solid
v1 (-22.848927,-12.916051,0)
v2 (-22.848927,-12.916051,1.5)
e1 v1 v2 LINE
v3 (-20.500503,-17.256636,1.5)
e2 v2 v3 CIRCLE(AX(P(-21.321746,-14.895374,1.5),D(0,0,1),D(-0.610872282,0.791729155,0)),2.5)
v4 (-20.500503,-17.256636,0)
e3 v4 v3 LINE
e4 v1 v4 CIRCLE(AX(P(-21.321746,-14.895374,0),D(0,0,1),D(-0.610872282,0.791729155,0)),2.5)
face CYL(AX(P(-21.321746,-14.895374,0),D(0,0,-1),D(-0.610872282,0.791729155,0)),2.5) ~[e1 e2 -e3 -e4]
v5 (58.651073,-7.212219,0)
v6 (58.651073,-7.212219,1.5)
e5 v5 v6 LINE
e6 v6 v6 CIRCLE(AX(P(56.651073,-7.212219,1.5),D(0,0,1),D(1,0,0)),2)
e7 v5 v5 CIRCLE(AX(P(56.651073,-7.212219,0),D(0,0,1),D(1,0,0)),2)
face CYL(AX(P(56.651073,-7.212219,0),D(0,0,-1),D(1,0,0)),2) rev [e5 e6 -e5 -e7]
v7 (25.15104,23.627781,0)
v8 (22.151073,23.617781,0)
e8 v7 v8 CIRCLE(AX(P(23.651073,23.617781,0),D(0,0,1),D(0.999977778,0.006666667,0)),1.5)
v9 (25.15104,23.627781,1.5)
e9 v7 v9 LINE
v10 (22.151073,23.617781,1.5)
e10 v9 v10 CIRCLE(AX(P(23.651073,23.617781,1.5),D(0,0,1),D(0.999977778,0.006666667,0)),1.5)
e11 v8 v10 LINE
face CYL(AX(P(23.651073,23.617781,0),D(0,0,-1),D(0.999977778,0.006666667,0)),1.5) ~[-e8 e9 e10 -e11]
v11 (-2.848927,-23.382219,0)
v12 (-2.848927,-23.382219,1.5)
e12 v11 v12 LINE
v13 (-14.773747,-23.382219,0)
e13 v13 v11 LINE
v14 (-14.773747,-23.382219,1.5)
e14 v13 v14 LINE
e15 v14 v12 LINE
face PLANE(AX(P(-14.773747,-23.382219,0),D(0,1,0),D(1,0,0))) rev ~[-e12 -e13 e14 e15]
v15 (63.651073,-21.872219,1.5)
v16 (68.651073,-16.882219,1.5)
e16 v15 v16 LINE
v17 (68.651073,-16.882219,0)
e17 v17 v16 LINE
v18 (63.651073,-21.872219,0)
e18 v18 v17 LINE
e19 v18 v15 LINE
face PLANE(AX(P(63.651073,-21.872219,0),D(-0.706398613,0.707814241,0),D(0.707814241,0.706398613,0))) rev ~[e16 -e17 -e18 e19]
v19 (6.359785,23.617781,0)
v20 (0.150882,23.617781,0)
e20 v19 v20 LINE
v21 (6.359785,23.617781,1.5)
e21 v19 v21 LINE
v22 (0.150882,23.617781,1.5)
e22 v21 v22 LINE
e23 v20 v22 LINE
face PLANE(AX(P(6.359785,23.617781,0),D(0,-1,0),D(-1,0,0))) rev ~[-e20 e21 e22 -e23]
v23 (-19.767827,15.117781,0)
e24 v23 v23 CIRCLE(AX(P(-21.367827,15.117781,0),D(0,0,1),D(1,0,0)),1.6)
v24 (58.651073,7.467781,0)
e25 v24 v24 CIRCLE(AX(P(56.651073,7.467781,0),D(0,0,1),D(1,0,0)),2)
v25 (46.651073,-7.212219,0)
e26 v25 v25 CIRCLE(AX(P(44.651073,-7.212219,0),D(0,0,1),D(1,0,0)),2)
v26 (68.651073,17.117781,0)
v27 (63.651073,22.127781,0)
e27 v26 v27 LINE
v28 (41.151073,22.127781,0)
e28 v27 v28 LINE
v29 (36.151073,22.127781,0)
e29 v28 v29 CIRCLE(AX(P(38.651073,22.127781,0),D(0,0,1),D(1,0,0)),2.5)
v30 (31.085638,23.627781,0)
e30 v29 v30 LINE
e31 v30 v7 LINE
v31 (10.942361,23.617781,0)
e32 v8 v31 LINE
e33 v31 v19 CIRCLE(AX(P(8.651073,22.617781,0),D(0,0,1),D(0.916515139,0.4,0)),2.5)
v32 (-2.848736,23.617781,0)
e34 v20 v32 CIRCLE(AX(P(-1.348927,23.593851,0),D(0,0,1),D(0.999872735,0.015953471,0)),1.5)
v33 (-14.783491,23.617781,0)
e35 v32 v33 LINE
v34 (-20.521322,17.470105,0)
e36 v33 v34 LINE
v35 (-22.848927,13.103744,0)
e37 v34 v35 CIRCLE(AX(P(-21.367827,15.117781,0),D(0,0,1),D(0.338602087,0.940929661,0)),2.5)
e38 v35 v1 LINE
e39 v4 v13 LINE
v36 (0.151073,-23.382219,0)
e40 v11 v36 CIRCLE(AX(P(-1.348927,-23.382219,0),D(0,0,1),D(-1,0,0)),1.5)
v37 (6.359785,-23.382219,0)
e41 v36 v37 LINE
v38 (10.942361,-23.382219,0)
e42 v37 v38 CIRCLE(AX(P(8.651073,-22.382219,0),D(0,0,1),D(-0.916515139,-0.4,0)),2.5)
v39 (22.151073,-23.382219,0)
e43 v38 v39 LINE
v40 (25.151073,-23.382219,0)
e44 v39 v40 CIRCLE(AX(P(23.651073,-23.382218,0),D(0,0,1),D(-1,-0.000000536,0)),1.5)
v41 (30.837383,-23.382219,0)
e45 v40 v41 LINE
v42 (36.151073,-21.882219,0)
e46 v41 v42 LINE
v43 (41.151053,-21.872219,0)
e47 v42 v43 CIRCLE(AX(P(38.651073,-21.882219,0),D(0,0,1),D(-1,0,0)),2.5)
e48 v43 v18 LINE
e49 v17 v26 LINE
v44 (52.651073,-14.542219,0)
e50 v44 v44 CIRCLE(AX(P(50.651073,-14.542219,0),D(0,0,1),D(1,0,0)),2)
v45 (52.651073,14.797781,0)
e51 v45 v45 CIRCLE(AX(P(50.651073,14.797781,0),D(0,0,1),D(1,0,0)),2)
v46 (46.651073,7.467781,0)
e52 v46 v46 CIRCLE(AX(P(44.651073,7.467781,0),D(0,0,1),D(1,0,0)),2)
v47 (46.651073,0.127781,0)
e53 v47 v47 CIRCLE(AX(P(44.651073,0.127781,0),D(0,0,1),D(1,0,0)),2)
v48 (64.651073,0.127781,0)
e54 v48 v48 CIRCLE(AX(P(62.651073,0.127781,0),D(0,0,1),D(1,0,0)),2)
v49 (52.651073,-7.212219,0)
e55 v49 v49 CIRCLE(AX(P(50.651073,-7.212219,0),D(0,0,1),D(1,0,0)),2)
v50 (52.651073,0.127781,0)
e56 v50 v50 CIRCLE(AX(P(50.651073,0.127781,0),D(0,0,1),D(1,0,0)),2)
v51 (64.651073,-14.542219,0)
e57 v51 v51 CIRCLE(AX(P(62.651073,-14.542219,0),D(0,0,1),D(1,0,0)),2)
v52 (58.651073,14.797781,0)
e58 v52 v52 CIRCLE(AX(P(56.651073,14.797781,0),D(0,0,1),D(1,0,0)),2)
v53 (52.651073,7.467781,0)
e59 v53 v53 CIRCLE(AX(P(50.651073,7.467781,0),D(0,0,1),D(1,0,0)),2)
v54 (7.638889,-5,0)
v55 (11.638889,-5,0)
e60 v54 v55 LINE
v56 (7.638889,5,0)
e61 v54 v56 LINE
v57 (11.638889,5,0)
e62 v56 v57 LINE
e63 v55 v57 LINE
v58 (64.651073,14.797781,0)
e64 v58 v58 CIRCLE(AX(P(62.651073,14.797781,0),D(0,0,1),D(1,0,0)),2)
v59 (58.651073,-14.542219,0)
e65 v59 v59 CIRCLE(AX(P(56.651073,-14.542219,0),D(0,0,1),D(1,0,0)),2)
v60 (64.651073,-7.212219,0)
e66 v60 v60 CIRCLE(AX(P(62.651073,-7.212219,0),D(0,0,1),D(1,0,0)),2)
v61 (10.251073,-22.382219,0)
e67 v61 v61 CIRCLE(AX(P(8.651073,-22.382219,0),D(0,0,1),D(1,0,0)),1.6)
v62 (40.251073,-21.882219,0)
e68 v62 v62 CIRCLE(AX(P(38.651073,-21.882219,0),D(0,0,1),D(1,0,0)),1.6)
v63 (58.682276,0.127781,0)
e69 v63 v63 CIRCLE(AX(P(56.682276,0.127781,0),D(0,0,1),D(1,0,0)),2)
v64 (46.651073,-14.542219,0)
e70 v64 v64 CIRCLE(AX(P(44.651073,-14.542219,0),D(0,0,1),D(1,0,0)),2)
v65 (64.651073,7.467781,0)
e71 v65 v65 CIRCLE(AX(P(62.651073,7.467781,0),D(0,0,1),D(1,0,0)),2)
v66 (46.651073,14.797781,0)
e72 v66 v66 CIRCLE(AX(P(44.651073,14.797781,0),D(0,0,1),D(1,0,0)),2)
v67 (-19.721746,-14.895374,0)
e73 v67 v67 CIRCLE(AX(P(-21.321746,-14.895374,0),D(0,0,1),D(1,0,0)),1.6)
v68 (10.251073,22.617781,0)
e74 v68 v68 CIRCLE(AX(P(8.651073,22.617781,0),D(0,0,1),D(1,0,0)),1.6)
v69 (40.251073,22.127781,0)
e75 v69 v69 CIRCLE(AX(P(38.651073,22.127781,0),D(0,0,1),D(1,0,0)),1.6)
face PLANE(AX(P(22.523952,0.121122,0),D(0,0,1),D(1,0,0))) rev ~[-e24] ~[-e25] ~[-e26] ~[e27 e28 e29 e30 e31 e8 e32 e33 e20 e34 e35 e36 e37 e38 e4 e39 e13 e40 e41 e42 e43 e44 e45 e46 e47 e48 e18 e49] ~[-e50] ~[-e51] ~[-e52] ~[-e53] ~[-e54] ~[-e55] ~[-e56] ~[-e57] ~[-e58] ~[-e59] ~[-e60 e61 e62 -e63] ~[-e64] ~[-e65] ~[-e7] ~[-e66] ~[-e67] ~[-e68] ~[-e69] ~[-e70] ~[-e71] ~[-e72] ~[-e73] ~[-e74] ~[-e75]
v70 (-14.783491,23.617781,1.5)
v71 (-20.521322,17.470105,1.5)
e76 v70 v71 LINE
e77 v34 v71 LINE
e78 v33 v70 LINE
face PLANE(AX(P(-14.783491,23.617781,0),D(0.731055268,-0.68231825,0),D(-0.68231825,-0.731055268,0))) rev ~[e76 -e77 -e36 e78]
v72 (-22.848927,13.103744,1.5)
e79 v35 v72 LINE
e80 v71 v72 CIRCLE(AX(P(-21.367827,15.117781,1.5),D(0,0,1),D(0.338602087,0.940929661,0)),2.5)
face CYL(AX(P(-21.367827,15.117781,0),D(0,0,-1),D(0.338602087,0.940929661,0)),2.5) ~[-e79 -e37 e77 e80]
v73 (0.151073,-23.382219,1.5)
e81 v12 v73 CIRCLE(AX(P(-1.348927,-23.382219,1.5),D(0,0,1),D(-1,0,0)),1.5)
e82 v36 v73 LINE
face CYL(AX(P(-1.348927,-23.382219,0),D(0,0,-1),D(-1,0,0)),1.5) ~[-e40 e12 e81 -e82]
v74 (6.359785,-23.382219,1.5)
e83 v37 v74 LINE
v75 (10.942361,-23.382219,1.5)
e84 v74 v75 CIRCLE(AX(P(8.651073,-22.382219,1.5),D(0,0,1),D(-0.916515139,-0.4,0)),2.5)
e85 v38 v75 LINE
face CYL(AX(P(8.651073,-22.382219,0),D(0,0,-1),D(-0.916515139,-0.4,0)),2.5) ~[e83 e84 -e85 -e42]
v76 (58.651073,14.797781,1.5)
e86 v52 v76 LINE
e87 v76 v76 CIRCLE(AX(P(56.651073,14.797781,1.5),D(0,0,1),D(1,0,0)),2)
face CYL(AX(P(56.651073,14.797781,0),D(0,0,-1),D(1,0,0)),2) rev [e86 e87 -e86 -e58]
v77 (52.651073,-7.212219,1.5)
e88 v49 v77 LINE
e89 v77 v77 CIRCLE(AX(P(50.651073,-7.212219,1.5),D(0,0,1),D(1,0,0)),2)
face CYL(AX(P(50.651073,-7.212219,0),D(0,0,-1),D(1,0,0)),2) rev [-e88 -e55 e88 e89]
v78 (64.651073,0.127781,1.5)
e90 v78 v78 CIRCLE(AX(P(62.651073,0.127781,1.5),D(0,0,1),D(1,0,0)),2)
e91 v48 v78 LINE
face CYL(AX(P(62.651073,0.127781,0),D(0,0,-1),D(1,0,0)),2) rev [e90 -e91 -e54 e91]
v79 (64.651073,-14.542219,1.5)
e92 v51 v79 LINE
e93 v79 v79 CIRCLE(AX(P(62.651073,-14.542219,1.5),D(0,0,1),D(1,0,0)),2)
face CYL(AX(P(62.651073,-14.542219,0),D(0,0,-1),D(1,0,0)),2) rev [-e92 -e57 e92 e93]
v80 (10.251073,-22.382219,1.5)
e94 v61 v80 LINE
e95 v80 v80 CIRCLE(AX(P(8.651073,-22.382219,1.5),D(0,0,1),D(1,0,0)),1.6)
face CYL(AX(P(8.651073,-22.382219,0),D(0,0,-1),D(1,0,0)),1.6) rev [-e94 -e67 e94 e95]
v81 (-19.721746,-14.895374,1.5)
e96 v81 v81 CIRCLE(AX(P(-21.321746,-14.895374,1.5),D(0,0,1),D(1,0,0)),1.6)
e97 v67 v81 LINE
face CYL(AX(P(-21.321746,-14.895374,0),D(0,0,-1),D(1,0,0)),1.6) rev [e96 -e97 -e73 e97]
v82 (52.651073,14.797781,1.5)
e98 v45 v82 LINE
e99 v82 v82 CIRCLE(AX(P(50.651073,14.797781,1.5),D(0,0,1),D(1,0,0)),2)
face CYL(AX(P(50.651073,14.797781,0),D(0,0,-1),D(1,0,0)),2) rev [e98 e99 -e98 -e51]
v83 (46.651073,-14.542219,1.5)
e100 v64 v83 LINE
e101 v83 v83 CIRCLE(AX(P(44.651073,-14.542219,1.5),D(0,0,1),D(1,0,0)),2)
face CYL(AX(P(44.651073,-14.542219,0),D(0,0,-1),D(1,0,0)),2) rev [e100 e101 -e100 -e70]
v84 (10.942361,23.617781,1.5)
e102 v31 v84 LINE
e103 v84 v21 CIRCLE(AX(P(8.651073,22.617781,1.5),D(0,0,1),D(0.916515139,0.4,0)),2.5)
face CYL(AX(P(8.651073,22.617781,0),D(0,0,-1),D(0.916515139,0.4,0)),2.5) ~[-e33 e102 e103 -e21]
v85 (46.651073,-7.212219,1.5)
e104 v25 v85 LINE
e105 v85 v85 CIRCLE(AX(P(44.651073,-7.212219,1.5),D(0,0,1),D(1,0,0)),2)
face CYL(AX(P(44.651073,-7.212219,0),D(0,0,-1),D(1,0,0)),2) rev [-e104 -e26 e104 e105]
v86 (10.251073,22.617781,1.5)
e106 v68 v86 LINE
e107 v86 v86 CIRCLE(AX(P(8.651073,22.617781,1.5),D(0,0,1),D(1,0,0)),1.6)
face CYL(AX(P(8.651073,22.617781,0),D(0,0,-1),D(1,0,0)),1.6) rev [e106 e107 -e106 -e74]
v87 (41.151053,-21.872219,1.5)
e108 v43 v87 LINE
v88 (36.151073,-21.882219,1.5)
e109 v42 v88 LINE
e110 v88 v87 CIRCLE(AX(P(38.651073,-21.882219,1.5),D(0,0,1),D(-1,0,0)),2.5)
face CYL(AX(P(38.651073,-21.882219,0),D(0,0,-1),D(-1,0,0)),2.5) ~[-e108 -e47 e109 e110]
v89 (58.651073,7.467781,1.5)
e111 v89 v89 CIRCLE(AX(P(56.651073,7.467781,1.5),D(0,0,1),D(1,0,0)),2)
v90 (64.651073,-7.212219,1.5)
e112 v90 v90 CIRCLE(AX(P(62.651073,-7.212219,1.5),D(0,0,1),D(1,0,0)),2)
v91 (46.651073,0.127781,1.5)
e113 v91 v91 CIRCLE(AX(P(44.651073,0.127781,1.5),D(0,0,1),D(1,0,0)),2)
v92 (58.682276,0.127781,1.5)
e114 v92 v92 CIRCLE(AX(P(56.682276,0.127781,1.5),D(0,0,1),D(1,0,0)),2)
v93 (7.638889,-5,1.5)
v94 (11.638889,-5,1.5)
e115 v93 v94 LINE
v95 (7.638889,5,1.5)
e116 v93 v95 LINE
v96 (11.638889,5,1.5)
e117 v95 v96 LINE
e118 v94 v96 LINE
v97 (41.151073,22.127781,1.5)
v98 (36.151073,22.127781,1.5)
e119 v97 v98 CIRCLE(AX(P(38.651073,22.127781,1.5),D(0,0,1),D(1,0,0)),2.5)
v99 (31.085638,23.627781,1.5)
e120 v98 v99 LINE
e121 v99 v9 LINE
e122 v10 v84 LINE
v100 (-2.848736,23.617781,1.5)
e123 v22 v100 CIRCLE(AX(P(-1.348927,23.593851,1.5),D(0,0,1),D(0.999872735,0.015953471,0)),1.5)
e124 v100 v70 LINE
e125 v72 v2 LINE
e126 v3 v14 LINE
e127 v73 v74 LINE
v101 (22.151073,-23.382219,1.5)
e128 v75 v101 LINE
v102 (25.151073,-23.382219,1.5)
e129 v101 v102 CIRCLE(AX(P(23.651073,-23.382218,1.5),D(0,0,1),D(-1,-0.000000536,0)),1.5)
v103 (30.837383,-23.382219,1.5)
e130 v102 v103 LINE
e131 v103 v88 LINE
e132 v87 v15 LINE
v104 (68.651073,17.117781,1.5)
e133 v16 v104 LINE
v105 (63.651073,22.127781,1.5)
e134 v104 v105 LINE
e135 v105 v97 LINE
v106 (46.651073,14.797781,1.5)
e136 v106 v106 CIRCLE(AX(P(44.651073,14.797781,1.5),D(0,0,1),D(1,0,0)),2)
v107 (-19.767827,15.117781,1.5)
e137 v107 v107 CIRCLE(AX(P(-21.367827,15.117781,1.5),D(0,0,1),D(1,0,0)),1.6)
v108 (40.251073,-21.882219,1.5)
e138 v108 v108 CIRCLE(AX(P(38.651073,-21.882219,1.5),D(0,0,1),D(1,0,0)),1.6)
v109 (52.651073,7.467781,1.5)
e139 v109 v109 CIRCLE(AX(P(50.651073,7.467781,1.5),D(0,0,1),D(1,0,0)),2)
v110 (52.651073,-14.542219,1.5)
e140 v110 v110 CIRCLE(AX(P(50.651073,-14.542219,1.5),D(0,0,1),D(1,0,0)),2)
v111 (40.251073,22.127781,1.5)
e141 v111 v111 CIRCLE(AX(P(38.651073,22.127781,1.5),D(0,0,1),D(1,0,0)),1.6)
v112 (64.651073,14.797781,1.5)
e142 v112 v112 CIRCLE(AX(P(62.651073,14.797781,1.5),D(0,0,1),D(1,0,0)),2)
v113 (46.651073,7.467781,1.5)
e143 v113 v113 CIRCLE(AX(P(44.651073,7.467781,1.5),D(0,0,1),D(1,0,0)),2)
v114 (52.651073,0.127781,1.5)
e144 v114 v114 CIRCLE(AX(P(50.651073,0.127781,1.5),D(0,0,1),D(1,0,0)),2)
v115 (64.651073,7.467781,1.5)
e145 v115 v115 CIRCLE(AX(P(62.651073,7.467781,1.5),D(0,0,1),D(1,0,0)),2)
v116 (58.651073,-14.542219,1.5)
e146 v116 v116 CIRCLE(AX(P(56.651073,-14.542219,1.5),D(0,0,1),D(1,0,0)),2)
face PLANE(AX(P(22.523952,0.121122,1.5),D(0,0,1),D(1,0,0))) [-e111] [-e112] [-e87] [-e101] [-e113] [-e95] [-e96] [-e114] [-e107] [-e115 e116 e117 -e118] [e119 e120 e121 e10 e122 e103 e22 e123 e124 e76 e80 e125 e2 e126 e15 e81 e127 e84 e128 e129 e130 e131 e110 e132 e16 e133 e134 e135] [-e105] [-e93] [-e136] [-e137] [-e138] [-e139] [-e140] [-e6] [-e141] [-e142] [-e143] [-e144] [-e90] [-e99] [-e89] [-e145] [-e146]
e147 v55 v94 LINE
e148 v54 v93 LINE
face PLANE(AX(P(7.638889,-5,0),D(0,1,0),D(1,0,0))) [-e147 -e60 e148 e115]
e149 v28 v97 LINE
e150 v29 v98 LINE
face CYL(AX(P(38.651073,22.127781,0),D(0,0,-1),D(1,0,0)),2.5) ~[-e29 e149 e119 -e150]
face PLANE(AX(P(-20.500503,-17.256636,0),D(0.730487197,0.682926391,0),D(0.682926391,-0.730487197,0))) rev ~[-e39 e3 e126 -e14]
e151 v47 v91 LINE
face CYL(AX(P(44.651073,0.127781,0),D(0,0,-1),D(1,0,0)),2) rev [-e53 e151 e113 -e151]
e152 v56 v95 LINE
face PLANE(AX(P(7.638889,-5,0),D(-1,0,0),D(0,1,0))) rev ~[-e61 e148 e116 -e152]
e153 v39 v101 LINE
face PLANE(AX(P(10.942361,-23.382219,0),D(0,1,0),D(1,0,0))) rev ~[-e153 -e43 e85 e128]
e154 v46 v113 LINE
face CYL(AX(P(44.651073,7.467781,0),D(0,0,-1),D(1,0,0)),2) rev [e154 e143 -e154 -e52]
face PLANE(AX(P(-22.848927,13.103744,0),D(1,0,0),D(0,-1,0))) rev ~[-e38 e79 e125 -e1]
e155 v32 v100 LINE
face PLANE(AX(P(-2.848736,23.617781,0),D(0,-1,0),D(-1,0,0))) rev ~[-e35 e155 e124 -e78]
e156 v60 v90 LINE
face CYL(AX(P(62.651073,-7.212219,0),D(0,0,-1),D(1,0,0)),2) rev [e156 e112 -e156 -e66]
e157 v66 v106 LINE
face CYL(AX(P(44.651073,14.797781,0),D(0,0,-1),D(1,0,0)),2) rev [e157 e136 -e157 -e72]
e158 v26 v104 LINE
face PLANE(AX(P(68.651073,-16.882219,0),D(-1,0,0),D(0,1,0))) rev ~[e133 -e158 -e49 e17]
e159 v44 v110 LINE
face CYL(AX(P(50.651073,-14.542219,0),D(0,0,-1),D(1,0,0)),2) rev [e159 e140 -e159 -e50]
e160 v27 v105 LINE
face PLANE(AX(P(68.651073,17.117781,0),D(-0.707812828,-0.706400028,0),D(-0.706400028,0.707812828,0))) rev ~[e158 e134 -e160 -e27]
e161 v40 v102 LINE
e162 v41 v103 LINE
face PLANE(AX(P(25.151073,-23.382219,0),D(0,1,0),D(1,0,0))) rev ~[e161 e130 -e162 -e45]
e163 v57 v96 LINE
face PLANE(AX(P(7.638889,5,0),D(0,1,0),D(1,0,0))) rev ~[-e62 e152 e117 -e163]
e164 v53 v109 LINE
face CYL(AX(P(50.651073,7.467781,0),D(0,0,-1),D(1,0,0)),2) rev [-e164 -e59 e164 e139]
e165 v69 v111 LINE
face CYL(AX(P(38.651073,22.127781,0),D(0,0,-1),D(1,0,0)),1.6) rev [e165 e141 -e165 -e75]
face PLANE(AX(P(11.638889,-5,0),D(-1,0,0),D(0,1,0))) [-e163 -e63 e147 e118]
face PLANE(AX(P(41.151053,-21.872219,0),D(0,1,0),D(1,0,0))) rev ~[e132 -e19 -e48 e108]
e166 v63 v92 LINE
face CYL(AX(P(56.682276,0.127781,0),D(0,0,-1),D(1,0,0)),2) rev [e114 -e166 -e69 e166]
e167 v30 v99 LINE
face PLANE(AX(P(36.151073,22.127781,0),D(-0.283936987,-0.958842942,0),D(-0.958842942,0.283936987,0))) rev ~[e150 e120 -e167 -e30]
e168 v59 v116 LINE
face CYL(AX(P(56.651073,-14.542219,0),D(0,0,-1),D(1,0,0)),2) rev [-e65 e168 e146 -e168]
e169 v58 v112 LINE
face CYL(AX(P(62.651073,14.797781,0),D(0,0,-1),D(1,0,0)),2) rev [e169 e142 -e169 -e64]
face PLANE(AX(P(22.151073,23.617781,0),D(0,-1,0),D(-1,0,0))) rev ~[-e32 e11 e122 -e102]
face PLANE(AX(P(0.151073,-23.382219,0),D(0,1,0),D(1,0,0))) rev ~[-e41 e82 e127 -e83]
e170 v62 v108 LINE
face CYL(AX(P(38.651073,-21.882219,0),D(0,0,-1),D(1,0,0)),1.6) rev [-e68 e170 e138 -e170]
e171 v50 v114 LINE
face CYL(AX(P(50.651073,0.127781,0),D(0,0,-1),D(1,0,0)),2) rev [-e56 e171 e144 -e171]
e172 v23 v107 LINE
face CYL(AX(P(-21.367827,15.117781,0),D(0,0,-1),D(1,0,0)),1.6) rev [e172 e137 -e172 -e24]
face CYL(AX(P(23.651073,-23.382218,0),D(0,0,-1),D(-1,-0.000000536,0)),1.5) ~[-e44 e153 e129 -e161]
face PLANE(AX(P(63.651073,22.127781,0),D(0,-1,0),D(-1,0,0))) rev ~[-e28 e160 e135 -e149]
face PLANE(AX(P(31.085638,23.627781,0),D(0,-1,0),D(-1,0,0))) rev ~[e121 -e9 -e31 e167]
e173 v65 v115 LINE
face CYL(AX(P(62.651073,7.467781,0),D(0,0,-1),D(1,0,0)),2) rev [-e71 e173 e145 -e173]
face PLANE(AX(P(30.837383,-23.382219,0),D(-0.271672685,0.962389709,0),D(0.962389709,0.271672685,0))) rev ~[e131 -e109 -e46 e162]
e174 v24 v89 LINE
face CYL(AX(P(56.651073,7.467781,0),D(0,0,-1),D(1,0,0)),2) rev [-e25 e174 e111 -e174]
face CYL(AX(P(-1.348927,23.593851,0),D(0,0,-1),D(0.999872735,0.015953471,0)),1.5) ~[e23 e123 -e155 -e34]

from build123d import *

# Parameters (mm, degrees)
F0_R     = 1.6
F0_W     = 4
F0_H     = 10
F0_R_2   = 2
F1_DEPTH = 1.5


# Not quite as in the source:
# - ends of sketch curves that miss each other by under 0.0002 mm in the source are joined


with BuildPart() as f1:
    # F0 (on Top) → F1 (new body)
    with BuildSketch(Plane.XY):
        with BuildLine():
            Line((25.1510733024, -23.3822189373), (30.8373828109, -23.3822189373))
            Line((30.8373828109, -23.3822189373), (36.1510733024, -21.8822189373))
            ThreePointArc((36.1510733024, -21.8822189373), (38.6560733124, -24.3822139373), (41.1510533024, -21.8722189373))
            Line((41.1510533024, -21.8722189373), (63.6510733024, -21.8722189373))
            Line((63.6510733024, -21.8722189373), (68.6510733024, -16.8822189373))
            Line((68.6510733024, -16.8822189373), (68.6510733024, 17.1177810627))
            Line((68.6510733024, 17.1177810627), (63.6510733024, 22.1277810627))
            Line((63.6510733024, 22.1277810627), (41.1510733024, 22.1277810627))
            ThreePointArc((41.1510733024, 22.1277810627), (38.6510733024, 24.6277810627), (36.1510733024, 22.1277810627))
            Line((36.1510733024, 22.1277810627), (31.0856380889, 23.6277810627))
            Line((31.0856380889, 23.6277810627), (25.1510399687, 23.6277810627))
            ThreePointArc((25.1510399687, 23.6277810627), (23.6460732747, 25.1177727292), (22.1510733024, 23.6177810627))
            Line((22.1510733024, 23.6177810627), (10.9423611499, 23.6177810627))
            ThreePointArc((10.9423611499, 23.6177810627), (8.6510733024, 25.1177810627), (6.359785455, 23.6177810627))
            Line((6.359785455, 23.6177810627), (0.1508824054, 23.6177810627))
            ThreePointArc((0.1508824054, 23.6177810627), (-1.3489266976, 25.0938508558), (-2.8487358005, 23.6177810627))
            Line((-2.8487358005, 23.6177810627), (-14.783491484, 23.6177810627))
            Line((-14.783491484, 23.6177810627), (-20.5213222757, 17.4701052144))
            ThreePointArc((-20.5213222757, 17.4701052144), (-23.5739450953, 16.2938104546), (-22.8489266976, 13.1037440347))
            Line((-22.8489266976, 13.1037440347), (-22.8489266976, -12.9160506452))
            ThreePointArc((-22.8489266976, -12.9160506452), (-23.5205541523, -16.0850132599), (-20.5005032054, -17.2566359677))
            Line((-20.5005032054, -17.2566359677), (-14.7737467559, -23.3822189373))
            Line((-14.7737467559, -23.3822189373), (-2.8489266976, -23.3822189373))
            ThreePointArc((-2.8489266976, -23.3822189373), (-1.3489266976, -24.8822189373), (0.1510733024, -23.3822189373))
            Line((0.1510733024, -23.3822189373), (6.359785455, -23.3822189373))
            ThreePointArc((6.359785455, -23.3822189373), (8.6510733024, -24.8822189373), (10.9423611499, -23.3822189373))
            Line((10.9423611499, -23.3822189373), (22.1510733024, -23.3822189373))
            ThreePointArc((22.1510733024, -23.3822189373), (23.6510729001, -24.8822181327), (25.1510733024, -23.3822189373))
        make_face()
        with Locations((-21.3217459931, -14.8953735334)):
            Circle(F0_R, mode=Mode.SUBTRACT)
        with Locations((8.6510733024, -22.3822189373)):
            Circle(F0_R, mode=Mode.SUBTRACT)
        with Locations((9.6388893649, 1.118e-07)):
            Rectangle(F0_W, F0_H, mode=Mode.SUBTRACT)
        with Locations((38.6510733024, -21.8822189373)):
            Circle(F0_R, mode=Mode.SUBTRACT)
        with Locations((44.6510733024, -14.5422189373)):
            Circle(F0_R_2, mode=Mode.SUBTRACT)
        with Locations((50.6510733024, -14.5422189373)):
            Circle(F0_R_2, mode=Mode.SUBTRACT)
        with Locations((56.6510733024, -14.5422189373)):
            Circle(F0_R_2, mode=Mode.SUBTRACT)
        with Locations((62.6510733024, -14.5422189373)):
            Circle(F0_R_2, mode=Mode.SUBTRACT)
        with Locations((44.6510733024, -7.2122189373)):
            Circle(F0_R_2, mode=Mode.SUBTRACT)
        with Locations((50.6510733024, -7.2122189373)):
            Circle(F0_R_2, mode=Mode.SUBTRACT)
        with Locations((56.6510733024, -7.2122189373)):
            Circle(F0_R_2, mode=Mode.SUBTRACT)
        with Locations((62.6510733024, -7.2122189373)):
            Circle(F0_R_2, mode=Mode.SUBTRACT)
        with Locations((-21.3678274943, 15.1177810627)):
            Circle(F0_R, mode=Mode.SUBTRACT)
        with Locations((8.6510733024, 22.6177810627)):
            Circle(F0_R, mode=Mode.SUBTRACT)
        with Locations((44.6510733024, 0.1277810627)):
            Circle(F0_R_2, mode=Mode.SUBTRACT)
        with Locations((44.6510733024, 7.4677810627)):
            Circle(F0_R_2, mode=Mode.SUBTRACT)
        with Locations((50.6510733024, 0.1277810627)):
            Circle(F0_R_2, mode=Mode.SUBTRACT)
        with Locations((56.6822756082, 0.1277810627)):
            Circle(F0_R_2, mode=Mode.SUBTRACT)
        with Locations((62.6510733024, 0.1277810627)):
            Circle(F0_R_2, mode=Mode.SUBTRACT)
        with Locations((50.6510733024, 7.4677810627)):
            Circle(F0_R_2, mode=Mode.SUBTRACT)
        with Locations((56.6510733024, 7.4677810627)):
            Circle(F0_R_2, mode=Mode.SUBTRACT)
        with Locations((62.6510733024, 7.4677810627)):
            Circle(F0_R_2, mode=Mode.SUBTRACT)
        with Locations((44.6510733024, 14.7977810627)):
            Circle(F0_R_2, mode=Mode.SUBTRACT)
        with Locations((38.6510733024, 22.1277810627)):
            Circle(F0_R, mode=Mode.SUBTRACT)
        with Locations((50.6510733024, 14.7977810627)):
            Circle(F0_R_2, mode=Mode.SUBTRACT)
        with Locations((56.6510733024, 14.7977810627)):
            Circle(F0_R_2, mode=Mode.SUBTRACT)
        with Locations((62.6510733024, 14.7977810627)):
            Circle(F0_R_2, mode=Mode.SUBTRACT)
    extrude(amount=F1_DEPTH)


solid = f1.part
